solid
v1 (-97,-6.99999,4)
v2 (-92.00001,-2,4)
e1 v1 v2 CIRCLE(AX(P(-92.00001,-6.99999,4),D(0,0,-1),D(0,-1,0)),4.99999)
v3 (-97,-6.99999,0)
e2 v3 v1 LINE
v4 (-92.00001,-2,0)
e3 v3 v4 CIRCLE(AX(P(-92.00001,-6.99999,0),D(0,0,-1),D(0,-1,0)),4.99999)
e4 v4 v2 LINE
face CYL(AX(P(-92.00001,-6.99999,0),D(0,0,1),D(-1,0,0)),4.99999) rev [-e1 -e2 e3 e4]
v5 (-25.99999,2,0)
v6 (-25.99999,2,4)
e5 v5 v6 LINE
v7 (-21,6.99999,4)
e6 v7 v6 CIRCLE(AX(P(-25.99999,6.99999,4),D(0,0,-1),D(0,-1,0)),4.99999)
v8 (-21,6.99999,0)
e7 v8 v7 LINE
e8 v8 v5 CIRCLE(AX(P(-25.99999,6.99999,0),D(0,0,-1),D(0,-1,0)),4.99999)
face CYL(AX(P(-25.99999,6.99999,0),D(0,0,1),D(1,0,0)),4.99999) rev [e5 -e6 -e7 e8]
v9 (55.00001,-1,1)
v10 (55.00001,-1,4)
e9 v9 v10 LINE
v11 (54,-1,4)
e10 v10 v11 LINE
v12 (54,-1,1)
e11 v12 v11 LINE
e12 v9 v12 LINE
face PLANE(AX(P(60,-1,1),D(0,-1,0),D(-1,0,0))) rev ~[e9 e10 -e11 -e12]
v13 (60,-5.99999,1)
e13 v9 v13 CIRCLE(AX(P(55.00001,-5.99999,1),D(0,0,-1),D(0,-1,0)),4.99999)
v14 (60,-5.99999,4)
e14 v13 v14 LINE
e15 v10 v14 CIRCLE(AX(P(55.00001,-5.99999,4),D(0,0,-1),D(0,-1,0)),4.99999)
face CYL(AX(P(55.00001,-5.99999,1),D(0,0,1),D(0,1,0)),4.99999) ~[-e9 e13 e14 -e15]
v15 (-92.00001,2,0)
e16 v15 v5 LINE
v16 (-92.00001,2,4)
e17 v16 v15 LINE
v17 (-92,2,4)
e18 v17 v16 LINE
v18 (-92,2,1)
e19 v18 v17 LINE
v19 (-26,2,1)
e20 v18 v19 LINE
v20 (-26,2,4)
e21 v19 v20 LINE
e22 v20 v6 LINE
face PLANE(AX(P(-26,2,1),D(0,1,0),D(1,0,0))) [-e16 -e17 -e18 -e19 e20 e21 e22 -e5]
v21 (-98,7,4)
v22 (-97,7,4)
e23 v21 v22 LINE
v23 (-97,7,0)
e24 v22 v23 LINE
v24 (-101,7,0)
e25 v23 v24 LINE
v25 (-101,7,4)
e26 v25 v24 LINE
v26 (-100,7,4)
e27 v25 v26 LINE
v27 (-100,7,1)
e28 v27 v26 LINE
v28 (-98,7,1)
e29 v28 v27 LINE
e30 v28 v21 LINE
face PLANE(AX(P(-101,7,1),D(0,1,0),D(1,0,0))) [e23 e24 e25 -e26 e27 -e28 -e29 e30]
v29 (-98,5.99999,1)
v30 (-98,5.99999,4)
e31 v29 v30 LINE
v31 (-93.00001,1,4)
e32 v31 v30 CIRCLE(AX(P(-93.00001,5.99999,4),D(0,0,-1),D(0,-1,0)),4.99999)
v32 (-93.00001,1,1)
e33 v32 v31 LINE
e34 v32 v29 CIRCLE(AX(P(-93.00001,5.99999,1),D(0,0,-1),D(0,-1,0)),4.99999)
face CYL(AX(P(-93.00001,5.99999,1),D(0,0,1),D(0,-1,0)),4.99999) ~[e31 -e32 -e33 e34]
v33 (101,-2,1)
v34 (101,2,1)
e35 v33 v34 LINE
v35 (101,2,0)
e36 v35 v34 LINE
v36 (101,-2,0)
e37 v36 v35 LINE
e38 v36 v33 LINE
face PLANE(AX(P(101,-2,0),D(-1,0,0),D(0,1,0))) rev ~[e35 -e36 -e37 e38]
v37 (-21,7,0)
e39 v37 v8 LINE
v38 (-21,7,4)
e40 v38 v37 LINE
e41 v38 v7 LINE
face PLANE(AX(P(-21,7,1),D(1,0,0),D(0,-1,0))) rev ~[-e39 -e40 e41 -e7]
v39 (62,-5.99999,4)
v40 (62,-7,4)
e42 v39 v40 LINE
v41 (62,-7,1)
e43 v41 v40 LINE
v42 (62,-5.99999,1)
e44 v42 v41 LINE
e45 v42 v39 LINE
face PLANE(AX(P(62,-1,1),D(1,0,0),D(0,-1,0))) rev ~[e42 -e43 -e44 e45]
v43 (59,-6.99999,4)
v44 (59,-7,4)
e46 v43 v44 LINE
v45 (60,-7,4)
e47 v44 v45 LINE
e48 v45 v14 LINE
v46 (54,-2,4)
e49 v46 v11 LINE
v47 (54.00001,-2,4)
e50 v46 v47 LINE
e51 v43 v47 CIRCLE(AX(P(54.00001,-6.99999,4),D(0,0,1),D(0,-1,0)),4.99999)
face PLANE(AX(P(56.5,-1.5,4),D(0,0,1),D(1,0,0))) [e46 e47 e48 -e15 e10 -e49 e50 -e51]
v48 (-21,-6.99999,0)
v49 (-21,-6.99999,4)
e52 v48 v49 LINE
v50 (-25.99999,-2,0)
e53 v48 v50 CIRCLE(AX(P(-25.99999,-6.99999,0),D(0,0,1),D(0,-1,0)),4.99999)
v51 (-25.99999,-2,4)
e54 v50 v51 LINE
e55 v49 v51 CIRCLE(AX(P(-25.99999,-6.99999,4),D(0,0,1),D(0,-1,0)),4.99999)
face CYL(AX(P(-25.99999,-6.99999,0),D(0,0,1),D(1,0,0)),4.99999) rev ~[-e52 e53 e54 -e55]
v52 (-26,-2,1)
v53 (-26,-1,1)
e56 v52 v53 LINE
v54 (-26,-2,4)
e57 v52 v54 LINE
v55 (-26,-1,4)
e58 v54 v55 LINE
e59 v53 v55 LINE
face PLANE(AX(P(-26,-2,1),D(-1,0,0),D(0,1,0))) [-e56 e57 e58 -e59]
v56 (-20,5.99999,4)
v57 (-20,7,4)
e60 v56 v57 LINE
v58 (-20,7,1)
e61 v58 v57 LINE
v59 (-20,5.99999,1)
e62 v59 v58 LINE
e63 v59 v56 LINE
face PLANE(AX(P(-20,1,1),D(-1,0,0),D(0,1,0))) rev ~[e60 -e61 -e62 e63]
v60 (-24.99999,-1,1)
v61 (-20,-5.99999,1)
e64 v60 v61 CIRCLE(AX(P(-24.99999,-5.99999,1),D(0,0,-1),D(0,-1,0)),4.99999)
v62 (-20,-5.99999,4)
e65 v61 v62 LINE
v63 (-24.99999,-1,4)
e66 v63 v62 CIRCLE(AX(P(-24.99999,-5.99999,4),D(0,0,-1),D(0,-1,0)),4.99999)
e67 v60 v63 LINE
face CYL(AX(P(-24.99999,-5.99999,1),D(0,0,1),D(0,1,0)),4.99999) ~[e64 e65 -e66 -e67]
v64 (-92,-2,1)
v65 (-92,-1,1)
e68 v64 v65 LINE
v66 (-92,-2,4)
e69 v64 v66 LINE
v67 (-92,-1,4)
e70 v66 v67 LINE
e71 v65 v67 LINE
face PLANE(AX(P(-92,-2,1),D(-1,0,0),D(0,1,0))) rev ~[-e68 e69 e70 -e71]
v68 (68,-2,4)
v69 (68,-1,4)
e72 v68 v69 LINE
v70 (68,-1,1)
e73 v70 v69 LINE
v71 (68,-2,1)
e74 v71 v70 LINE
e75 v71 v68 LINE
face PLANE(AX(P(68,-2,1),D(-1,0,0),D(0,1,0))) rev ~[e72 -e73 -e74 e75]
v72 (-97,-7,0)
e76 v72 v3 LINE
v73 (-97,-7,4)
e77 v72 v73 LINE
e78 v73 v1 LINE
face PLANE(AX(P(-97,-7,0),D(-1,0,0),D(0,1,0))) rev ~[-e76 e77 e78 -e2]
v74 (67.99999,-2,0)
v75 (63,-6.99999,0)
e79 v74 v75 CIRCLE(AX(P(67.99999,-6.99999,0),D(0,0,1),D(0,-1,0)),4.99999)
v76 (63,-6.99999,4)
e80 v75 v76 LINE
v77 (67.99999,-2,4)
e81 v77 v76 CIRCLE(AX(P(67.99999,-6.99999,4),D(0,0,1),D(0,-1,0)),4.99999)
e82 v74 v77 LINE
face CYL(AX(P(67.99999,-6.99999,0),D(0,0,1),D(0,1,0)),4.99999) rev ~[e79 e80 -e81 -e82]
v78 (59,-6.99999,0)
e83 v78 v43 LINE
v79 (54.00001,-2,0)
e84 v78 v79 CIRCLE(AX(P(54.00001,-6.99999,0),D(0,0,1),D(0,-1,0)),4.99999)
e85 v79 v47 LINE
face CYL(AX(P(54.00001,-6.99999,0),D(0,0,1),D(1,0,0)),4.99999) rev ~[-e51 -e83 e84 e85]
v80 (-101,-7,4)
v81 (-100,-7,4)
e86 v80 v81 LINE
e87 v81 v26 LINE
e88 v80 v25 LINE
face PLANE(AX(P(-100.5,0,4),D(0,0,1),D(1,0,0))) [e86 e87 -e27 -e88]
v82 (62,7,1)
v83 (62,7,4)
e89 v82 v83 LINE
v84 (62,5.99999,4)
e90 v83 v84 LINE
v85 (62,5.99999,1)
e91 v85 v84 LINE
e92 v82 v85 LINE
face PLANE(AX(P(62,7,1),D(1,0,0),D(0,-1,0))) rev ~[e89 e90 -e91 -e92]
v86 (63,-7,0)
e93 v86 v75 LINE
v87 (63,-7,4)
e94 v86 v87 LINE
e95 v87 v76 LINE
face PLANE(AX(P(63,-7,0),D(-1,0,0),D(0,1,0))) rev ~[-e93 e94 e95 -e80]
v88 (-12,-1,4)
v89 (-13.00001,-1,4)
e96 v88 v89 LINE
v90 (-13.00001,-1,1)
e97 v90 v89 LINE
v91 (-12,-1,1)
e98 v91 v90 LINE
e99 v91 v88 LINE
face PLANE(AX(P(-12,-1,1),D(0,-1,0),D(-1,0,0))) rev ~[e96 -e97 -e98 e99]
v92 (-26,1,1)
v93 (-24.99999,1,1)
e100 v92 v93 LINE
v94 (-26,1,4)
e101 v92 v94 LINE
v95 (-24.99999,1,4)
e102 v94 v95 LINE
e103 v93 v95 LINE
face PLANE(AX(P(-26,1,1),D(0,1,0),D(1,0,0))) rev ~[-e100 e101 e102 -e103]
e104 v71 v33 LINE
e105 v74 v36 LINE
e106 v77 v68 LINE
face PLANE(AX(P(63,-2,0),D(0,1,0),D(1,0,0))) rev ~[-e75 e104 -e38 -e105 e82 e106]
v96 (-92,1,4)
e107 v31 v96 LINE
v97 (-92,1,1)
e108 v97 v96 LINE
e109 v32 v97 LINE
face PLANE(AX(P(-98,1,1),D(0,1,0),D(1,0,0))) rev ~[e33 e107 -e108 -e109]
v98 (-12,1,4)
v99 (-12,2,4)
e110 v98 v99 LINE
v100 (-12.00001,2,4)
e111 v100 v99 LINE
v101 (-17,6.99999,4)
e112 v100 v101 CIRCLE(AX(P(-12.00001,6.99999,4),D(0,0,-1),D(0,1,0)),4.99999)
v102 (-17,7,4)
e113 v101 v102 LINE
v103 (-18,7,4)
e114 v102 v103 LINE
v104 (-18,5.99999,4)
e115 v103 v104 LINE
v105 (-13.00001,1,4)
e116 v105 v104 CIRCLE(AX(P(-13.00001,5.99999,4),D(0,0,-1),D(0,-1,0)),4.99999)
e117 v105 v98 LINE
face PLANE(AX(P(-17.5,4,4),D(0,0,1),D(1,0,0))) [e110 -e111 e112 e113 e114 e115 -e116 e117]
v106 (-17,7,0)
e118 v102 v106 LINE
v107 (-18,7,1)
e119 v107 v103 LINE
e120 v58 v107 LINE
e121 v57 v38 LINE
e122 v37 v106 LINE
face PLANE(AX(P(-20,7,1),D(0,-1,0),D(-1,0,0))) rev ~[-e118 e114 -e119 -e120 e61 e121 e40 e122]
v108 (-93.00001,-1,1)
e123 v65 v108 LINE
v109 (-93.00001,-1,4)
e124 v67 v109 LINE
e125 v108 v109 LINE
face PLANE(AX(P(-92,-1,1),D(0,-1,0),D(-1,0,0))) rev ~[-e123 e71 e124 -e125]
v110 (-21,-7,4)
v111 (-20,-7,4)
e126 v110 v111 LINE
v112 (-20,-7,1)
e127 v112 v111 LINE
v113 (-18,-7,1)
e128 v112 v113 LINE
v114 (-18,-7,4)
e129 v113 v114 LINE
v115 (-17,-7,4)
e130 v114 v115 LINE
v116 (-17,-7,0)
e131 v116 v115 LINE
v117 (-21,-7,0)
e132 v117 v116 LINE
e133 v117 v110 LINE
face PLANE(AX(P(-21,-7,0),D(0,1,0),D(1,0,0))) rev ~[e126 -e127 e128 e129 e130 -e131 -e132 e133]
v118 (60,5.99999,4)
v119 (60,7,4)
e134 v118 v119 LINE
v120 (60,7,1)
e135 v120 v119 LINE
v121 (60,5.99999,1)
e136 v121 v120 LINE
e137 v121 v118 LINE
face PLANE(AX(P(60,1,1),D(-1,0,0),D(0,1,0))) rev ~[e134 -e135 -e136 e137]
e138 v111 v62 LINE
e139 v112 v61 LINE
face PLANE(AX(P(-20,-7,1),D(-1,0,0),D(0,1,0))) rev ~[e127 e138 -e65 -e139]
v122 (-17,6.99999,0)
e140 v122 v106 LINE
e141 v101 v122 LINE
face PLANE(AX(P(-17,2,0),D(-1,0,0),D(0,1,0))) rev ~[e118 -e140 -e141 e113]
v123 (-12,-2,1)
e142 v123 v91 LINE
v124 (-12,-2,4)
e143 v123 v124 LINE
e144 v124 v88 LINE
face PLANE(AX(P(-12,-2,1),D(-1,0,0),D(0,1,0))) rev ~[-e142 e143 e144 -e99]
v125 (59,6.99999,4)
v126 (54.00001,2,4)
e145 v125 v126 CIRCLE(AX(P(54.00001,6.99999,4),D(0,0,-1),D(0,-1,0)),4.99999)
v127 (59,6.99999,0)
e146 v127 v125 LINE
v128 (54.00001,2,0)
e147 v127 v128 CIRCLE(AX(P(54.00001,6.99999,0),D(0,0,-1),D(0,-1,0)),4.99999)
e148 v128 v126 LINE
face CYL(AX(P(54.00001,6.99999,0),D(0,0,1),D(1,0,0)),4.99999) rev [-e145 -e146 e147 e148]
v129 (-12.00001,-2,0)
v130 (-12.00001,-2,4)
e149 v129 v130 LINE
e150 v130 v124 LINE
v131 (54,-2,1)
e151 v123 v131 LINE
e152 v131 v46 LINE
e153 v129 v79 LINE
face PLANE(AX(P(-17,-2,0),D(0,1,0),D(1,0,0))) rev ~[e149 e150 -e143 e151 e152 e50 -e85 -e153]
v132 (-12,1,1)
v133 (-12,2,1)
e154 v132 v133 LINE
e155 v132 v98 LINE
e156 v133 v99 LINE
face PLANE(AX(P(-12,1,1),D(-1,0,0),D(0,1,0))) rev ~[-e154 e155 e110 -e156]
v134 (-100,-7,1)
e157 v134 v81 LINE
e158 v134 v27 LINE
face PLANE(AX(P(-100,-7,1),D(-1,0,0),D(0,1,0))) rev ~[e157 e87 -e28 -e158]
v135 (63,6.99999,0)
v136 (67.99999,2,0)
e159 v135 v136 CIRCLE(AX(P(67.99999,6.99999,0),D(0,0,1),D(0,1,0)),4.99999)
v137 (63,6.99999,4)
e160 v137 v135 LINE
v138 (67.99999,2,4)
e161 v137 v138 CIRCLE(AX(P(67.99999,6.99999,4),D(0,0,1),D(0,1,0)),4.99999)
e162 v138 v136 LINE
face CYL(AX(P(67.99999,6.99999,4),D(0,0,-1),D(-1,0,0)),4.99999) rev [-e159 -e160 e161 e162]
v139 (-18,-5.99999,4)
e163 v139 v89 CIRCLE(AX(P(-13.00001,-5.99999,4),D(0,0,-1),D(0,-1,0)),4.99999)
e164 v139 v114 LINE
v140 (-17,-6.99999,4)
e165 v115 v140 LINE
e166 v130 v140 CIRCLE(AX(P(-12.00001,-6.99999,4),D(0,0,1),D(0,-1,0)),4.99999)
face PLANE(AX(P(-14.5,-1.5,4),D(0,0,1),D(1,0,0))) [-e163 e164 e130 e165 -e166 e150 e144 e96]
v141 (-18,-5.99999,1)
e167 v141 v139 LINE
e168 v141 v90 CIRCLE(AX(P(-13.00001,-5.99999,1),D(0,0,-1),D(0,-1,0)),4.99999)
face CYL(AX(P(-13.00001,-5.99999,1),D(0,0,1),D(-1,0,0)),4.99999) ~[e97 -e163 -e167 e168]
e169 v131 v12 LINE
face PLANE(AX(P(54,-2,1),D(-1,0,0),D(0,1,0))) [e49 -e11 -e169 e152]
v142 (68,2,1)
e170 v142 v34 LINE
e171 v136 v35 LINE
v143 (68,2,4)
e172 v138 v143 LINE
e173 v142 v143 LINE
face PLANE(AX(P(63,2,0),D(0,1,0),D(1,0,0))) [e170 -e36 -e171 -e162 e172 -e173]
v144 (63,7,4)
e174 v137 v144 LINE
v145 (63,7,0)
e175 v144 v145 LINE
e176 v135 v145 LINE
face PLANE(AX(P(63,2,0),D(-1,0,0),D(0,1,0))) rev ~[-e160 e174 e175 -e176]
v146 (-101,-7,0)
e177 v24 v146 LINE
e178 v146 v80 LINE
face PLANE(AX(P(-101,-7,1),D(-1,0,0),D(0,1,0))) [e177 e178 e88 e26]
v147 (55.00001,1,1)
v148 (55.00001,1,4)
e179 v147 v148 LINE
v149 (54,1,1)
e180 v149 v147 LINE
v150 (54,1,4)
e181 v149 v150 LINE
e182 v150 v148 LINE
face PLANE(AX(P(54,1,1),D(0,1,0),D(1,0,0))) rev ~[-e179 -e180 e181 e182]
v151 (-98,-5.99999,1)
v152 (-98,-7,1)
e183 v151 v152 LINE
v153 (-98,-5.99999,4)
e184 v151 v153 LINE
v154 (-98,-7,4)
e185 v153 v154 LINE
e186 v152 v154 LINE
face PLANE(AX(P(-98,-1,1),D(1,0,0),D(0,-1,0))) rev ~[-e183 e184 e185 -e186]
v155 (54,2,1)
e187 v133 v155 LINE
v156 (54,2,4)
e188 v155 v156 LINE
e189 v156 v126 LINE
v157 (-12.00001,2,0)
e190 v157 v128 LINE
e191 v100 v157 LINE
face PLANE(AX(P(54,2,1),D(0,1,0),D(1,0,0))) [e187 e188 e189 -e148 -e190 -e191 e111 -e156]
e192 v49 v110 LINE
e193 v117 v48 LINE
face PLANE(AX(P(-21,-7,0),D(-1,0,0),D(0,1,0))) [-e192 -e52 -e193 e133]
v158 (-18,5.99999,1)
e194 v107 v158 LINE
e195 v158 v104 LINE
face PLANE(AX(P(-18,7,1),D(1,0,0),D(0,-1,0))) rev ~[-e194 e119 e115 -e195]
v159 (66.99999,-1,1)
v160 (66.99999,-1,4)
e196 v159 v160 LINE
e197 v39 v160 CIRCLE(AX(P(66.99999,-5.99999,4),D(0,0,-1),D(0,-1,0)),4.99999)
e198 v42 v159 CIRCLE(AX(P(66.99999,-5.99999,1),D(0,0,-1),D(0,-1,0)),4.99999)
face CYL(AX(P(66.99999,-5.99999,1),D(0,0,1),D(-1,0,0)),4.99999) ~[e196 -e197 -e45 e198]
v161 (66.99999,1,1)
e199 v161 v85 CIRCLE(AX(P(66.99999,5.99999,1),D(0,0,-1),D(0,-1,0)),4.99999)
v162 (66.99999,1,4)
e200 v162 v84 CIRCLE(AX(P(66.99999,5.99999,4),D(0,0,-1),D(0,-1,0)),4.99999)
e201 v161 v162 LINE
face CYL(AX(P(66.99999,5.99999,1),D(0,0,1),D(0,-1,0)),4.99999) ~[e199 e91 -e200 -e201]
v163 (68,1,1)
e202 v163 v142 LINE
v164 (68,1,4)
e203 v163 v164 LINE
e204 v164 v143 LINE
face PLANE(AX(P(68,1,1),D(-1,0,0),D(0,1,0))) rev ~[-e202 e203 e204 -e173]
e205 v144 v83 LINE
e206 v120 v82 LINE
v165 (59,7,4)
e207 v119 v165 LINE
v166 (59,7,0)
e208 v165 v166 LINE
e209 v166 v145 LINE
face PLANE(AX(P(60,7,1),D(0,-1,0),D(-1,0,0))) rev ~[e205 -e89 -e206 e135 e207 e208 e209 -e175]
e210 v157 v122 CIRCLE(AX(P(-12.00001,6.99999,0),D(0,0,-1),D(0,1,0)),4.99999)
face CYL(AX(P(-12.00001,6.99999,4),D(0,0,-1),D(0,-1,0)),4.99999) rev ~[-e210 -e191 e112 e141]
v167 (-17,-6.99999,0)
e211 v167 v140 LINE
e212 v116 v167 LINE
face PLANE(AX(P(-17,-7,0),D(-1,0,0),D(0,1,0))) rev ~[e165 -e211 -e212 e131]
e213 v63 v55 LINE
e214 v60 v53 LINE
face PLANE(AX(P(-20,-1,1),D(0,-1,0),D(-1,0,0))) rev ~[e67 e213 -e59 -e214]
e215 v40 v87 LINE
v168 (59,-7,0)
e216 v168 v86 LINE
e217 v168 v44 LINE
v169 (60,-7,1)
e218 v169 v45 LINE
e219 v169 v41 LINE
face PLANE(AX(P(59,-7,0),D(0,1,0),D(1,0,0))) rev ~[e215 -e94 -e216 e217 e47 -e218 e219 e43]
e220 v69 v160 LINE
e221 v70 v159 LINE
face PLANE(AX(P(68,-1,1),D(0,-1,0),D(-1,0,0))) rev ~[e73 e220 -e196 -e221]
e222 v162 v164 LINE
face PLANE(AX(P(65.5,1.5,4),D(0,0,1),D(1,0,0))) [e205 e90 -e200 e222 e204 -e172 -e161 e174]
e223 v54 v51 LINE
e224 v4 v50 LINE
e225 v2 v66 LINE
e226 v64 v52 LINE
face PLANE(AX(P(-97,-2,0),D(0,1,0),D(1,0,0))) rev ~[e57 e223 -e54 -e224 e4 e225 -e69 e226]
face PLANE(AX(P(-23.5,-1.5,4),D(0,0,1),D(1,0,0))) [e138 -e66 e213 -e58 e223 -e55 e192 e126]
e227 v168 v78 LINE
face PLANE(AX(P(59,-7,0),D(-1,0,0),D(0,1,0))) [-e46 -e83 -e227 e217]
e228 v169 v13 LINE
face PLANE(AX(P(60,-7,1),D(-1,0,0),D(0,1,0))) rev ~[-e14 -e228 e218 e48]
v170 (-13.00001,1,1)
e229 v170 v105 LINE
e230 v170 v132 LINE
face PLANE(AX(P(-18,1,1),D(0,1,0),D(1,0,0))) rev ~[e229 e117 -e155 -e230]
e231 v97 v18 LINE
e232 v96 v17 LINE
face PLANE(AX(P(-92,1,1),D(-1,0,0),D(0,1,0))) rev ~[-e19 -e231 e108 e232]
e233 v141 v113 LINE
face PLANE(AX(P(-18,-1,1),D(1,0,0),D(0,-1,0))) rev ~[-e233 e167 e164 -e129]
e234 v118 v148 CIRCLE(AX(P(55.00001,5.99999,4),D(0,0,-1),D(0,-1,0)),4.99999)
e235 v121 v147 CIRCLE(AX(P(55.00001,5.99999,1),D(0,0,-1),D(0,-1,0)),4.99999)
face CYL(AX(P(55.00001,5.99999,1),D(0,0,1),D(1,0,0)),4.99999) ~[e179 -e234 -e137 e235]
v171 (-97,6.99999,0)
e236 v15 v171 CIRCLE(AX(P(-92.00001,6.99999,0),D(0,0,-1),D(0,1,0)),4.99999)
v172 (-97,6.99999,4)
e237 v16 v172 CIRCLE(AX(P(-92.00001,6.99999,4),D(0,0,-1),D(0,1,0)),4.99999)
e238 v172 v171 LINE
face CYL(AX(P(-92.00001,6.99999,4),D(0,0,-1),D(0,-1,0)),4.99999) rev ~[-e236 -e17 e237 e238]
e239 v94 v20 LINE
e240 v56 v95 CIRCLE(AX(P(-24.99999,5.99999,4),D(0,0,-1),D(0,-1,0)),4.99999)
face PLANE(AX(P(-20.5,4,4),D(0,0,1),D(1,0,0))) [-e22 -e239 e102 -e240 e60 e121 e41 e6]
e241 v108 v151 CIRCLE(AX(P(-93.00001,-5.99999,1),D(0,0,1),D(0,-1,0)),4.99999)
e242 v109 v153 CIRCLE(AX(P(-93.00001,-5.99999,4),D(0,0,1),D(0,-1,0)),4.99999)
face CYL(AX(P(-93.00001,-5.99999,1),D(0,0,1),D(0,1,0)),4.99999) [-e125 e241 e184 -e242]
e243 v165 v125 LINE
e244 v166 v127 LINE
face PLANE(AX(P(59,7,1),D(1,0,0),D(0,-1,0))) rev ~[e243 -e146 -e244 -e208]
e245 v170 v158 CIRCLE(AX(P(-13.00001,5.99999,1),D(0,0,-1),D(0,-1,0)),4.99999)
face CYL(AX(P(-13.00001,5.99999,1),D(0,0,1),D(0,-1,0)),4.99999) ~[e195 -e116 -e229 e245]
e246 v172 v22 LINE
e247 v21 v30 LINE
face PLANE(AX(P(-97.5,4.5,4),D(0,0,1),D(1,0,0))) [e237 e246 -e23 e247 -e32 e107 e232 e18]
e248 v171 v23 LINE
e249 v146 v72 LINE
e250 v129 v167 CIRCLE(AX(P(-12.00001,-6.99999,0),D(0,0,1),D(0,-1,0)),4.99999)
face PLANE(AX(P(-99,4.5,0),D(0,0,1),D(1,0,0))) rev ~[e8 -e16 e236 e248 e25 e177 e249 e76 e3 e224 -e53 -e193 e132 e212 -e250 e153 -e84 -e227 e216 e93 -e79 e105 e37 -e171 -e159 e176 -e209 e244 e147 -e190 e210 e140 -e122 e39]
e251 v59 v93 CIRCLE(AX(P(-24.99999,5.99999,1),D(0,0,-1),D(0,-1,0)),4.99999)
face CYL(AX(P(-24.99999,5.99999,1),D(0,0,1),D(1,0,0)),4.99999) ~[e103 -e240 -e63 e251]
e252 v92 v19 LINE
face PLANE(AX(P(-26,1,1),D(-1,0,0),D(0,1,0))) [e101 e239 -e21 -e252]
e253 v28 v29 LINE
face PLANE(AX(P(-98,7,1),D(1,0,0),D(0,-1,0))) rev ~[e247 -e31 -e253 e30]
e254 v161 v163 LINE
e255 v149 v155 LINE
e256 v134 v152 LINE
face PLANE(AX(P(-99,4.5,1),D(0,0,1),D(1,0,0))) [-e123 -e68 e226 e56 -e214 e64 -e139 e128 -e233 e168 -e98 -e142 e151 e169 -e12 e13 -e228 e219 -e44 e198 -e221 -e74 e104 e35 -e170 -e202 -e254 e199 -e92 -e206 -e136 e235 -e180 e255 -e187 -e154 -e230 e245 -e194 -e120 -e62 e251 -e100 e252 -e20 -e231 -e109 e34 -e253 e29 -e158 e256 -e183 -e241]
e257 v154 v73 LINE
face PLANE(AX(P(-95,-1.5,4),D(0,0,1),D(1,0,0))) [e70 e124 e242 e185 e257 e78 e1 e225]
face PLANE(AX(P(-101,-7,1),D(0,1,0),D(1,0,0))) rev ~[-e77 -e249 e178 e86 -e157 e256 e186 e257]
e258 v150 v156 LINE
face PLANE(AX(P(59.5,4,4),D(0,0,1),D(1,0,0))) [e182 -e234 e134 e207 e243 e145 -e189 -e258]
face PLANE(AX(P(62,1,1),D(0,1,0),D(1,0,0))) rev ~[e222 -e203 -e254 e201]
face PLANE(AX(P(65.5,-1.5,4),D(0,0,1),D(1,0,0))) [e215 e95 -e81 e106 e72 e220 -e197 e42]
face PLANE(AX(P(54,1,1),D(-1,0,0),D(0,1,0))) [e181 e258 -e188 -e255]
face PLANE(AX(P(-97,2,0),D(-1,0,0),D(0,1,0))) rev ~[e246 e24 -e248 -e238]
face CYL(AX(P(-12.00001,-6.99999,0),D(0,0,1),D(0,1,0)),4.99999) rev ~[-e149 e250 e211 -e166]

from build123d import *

# Parameters (mm, degrees)
F0_W     = 4
F0_H     = 4
F0_H_2   = 5
F0_W_2   = 76
F0_H_3   = 2.5597222634
F0_H_4   = 2.4402777366
F0_W_3   = 38
F1_DEPTH = 1
F2_W     = 1
F2_H     = 14
F2_H_2   = 5
F3_DEPTH = 3
F4_R     = 4.99999
F2_W_2   = 5
F2_H_3   = 1
F5_DEPTH = 3
F6_R     = 4.99999
F7_DEPTH = 3
F8_R     = 4.99999


# Not quite as in the source:
# - a fillet or chamfer is up to 0.001 mm smaller than in the source, because OpenCascade refuses the exact size


with BuildPart() as f1:
    # F0 (on Top) → F1 (new body)
    with BuildSketch(Plane.XY):
        Polygon((-101, 2), (-97, 2), (-97, 4.5597222634), (-97, 7), (-101, 7), align=None)
        with Locations((-99, 0)):
            Rectangle(F0_W, F0_H)
        with Locations((-99, -4.5)):
            Rectangle(F0_W, F0_H_2)
        with Locations((-59, 0)):
            Rectangle(F0_W_2, F0_H)
        with Locations((-19, 3.2798611317)):
            Rectangle(F0_W, F0_H_3)
        with Locations((-19, 0)):
            Rectangle(F0_W, F0_H)
        with Locations((-19, -4.5)):
            Rectangle(F0_W, F0_H_2)
        with Locations((-19, 5.7798611317)):
            Rectangle(F0_W, F0_H_4)
        with Locations((21, 0)):
            Rectangle(F0_W_2, F0_H)
        with Locations((61, 5.7798611317)):
            Rectangle(F0_W, F0_H_4)
        with Locations((61, 3.2798611317)):
            Rectangle(F0_W, F0_H_3)
        with Locations((61, -4.5)):
            Rectangle(F0_W, F0_H_2)
        with Locations((61, 0)):
            Rectangle(F0_W, F0_H)
        with Locations((82, 0)):
            Rectangle(F0_W_3, F0_H)
    extrude(amount=F1_DEPTH)

    # F2 (on face) → F3 (join)
    with BuildSketch(Plane.XY.offset(1)):
        with Locations((-100.5, 0)):
            Rectangle(F2_W, F2_H)
        with Locations((-97.5, 4.5)):
            Rectangle(F2_W, F2_H_2)
        Polygon((-97, 2), (-98, 2), (-98, 1), (-92, 1), (-92, 2), align=None)
        Polygon((-98, -1), (-98, -2), (-97, -2), (-92, -2), (-92, -1), align=None)
        with Locations((-97.5, -4.5)):
            Rectangle(F2_W, F2_H_2)
    extrude(amount=F3_DEPTH)

    # F4 (radius 5 in the source; OpenCascade refuses exactly that, so slightly less here)
    f4_edges = [f1.edges().sort_by_distance(p)[0] for p in [
        (-97, -2, 2),
        (-98, 1, 2.5),
        (-98, -1, 2.5),
        (-97, 2, 2),
    ]]
    fillet(f4_edges, radius=F4_R)

    # F2 (on face) → F5 (join)
    with BuildSketch(Plane.XY.offset(1)):
        Polygon((-21, 7), (-21, 2), (-21, 1), (-20, 1), (-20, 7), align=None)
        Polygon((-17, 7), (-18, 7), (-18, 1), (-17, 1), (-17, 2), align=None)
        with Locations((-14.5, 1.5)):
            Rectangle(F2_W_2, F2_H_3)
        with Locations((-23.5, 1.5)):
            Rectangle(F2_W_2, F2_H_3)
        with Locations((-23.5, -1.5)):
            Rectangle(F2_W_2, F2_H_3)
        Polygon((-21, -1), (-21, -2), (-21, -7), (-20, -7), (-20, -1), align=None)
        with Locations((-14.5, -1.5)):
            Rectangle(F2_W_2, F2_H_3)
        Polygon((-18, -1), (-18, -7), (-17, -7), (-17, -2), (-17, -1), align=None)
    extrude(amount=F5_DEPTH)

    # F6 (radius 5 in the source; OpenCascade refuses exactly that, so slightly less here)
    f6_edges = [f1.edges().sort_by_distance(p)[0] for p in [
        (-18, 1, 2.5),
        (-20, 1, 2.5),
        (-17, -2, 2),
        (-20, -1, 2.5),
        (-21, -2, 2),
        (-21, 2, 2),
        (-17, 2, 2),
        (-18, -1, 2.5),
    ]]
    fillet(f6_edges, radius=F6_R)

    # F2 (on face) → F7 (join)
    with BuildSketch(Plane.XY.offset(1)):
        Polygon((59, 7), (59, 2), (59, 1), (60, 1), (60, 7), align=None)
        with Locations((65.5, 1.5)):
            Rectangle(F2_W_2, F2_H_3)
        Polygon((63, 7), (62, 7), (62, 1), (63, 1), (63, 2), align=None)
        with Locations((65.5, -1.5)):
            Rectangle(F2_W_2, F2_H_3)
        Polygon((62, -1), (62, -7), (63, -7), (63, -2), (63, -1), align=None)
        with Locations((56.5, 1.5)):
            Rectangle(F2_W_2, F2_H_3)
        with Locations((56.5, -1.5)):
            Rectangle(F2_W_2, F2_H_3)
        Polygon((59, -1), (59, -2), (59, -7), (60, -7), (60, -1), align=None)
    extrude(amount=F7_DEPTH)

    # F8 (radius 5 in the source; OpenCascade refuses exactly that, so slightly less here)
    f8_edges = [f1.edges().sort_by_distance(p)[0] for p in [
        (63, -2, 2),
        (60, 1, 2.5),
        (62, 1, 2.5),
        (60, -1, 2.5),
        (62, -1, 2.5),
        (59, -2, 2),
        (59, 2, 2),
        (63, 2, 2),
    ]]
    fillet(f8_edges, radius=F8_R)


solid = f1.part
